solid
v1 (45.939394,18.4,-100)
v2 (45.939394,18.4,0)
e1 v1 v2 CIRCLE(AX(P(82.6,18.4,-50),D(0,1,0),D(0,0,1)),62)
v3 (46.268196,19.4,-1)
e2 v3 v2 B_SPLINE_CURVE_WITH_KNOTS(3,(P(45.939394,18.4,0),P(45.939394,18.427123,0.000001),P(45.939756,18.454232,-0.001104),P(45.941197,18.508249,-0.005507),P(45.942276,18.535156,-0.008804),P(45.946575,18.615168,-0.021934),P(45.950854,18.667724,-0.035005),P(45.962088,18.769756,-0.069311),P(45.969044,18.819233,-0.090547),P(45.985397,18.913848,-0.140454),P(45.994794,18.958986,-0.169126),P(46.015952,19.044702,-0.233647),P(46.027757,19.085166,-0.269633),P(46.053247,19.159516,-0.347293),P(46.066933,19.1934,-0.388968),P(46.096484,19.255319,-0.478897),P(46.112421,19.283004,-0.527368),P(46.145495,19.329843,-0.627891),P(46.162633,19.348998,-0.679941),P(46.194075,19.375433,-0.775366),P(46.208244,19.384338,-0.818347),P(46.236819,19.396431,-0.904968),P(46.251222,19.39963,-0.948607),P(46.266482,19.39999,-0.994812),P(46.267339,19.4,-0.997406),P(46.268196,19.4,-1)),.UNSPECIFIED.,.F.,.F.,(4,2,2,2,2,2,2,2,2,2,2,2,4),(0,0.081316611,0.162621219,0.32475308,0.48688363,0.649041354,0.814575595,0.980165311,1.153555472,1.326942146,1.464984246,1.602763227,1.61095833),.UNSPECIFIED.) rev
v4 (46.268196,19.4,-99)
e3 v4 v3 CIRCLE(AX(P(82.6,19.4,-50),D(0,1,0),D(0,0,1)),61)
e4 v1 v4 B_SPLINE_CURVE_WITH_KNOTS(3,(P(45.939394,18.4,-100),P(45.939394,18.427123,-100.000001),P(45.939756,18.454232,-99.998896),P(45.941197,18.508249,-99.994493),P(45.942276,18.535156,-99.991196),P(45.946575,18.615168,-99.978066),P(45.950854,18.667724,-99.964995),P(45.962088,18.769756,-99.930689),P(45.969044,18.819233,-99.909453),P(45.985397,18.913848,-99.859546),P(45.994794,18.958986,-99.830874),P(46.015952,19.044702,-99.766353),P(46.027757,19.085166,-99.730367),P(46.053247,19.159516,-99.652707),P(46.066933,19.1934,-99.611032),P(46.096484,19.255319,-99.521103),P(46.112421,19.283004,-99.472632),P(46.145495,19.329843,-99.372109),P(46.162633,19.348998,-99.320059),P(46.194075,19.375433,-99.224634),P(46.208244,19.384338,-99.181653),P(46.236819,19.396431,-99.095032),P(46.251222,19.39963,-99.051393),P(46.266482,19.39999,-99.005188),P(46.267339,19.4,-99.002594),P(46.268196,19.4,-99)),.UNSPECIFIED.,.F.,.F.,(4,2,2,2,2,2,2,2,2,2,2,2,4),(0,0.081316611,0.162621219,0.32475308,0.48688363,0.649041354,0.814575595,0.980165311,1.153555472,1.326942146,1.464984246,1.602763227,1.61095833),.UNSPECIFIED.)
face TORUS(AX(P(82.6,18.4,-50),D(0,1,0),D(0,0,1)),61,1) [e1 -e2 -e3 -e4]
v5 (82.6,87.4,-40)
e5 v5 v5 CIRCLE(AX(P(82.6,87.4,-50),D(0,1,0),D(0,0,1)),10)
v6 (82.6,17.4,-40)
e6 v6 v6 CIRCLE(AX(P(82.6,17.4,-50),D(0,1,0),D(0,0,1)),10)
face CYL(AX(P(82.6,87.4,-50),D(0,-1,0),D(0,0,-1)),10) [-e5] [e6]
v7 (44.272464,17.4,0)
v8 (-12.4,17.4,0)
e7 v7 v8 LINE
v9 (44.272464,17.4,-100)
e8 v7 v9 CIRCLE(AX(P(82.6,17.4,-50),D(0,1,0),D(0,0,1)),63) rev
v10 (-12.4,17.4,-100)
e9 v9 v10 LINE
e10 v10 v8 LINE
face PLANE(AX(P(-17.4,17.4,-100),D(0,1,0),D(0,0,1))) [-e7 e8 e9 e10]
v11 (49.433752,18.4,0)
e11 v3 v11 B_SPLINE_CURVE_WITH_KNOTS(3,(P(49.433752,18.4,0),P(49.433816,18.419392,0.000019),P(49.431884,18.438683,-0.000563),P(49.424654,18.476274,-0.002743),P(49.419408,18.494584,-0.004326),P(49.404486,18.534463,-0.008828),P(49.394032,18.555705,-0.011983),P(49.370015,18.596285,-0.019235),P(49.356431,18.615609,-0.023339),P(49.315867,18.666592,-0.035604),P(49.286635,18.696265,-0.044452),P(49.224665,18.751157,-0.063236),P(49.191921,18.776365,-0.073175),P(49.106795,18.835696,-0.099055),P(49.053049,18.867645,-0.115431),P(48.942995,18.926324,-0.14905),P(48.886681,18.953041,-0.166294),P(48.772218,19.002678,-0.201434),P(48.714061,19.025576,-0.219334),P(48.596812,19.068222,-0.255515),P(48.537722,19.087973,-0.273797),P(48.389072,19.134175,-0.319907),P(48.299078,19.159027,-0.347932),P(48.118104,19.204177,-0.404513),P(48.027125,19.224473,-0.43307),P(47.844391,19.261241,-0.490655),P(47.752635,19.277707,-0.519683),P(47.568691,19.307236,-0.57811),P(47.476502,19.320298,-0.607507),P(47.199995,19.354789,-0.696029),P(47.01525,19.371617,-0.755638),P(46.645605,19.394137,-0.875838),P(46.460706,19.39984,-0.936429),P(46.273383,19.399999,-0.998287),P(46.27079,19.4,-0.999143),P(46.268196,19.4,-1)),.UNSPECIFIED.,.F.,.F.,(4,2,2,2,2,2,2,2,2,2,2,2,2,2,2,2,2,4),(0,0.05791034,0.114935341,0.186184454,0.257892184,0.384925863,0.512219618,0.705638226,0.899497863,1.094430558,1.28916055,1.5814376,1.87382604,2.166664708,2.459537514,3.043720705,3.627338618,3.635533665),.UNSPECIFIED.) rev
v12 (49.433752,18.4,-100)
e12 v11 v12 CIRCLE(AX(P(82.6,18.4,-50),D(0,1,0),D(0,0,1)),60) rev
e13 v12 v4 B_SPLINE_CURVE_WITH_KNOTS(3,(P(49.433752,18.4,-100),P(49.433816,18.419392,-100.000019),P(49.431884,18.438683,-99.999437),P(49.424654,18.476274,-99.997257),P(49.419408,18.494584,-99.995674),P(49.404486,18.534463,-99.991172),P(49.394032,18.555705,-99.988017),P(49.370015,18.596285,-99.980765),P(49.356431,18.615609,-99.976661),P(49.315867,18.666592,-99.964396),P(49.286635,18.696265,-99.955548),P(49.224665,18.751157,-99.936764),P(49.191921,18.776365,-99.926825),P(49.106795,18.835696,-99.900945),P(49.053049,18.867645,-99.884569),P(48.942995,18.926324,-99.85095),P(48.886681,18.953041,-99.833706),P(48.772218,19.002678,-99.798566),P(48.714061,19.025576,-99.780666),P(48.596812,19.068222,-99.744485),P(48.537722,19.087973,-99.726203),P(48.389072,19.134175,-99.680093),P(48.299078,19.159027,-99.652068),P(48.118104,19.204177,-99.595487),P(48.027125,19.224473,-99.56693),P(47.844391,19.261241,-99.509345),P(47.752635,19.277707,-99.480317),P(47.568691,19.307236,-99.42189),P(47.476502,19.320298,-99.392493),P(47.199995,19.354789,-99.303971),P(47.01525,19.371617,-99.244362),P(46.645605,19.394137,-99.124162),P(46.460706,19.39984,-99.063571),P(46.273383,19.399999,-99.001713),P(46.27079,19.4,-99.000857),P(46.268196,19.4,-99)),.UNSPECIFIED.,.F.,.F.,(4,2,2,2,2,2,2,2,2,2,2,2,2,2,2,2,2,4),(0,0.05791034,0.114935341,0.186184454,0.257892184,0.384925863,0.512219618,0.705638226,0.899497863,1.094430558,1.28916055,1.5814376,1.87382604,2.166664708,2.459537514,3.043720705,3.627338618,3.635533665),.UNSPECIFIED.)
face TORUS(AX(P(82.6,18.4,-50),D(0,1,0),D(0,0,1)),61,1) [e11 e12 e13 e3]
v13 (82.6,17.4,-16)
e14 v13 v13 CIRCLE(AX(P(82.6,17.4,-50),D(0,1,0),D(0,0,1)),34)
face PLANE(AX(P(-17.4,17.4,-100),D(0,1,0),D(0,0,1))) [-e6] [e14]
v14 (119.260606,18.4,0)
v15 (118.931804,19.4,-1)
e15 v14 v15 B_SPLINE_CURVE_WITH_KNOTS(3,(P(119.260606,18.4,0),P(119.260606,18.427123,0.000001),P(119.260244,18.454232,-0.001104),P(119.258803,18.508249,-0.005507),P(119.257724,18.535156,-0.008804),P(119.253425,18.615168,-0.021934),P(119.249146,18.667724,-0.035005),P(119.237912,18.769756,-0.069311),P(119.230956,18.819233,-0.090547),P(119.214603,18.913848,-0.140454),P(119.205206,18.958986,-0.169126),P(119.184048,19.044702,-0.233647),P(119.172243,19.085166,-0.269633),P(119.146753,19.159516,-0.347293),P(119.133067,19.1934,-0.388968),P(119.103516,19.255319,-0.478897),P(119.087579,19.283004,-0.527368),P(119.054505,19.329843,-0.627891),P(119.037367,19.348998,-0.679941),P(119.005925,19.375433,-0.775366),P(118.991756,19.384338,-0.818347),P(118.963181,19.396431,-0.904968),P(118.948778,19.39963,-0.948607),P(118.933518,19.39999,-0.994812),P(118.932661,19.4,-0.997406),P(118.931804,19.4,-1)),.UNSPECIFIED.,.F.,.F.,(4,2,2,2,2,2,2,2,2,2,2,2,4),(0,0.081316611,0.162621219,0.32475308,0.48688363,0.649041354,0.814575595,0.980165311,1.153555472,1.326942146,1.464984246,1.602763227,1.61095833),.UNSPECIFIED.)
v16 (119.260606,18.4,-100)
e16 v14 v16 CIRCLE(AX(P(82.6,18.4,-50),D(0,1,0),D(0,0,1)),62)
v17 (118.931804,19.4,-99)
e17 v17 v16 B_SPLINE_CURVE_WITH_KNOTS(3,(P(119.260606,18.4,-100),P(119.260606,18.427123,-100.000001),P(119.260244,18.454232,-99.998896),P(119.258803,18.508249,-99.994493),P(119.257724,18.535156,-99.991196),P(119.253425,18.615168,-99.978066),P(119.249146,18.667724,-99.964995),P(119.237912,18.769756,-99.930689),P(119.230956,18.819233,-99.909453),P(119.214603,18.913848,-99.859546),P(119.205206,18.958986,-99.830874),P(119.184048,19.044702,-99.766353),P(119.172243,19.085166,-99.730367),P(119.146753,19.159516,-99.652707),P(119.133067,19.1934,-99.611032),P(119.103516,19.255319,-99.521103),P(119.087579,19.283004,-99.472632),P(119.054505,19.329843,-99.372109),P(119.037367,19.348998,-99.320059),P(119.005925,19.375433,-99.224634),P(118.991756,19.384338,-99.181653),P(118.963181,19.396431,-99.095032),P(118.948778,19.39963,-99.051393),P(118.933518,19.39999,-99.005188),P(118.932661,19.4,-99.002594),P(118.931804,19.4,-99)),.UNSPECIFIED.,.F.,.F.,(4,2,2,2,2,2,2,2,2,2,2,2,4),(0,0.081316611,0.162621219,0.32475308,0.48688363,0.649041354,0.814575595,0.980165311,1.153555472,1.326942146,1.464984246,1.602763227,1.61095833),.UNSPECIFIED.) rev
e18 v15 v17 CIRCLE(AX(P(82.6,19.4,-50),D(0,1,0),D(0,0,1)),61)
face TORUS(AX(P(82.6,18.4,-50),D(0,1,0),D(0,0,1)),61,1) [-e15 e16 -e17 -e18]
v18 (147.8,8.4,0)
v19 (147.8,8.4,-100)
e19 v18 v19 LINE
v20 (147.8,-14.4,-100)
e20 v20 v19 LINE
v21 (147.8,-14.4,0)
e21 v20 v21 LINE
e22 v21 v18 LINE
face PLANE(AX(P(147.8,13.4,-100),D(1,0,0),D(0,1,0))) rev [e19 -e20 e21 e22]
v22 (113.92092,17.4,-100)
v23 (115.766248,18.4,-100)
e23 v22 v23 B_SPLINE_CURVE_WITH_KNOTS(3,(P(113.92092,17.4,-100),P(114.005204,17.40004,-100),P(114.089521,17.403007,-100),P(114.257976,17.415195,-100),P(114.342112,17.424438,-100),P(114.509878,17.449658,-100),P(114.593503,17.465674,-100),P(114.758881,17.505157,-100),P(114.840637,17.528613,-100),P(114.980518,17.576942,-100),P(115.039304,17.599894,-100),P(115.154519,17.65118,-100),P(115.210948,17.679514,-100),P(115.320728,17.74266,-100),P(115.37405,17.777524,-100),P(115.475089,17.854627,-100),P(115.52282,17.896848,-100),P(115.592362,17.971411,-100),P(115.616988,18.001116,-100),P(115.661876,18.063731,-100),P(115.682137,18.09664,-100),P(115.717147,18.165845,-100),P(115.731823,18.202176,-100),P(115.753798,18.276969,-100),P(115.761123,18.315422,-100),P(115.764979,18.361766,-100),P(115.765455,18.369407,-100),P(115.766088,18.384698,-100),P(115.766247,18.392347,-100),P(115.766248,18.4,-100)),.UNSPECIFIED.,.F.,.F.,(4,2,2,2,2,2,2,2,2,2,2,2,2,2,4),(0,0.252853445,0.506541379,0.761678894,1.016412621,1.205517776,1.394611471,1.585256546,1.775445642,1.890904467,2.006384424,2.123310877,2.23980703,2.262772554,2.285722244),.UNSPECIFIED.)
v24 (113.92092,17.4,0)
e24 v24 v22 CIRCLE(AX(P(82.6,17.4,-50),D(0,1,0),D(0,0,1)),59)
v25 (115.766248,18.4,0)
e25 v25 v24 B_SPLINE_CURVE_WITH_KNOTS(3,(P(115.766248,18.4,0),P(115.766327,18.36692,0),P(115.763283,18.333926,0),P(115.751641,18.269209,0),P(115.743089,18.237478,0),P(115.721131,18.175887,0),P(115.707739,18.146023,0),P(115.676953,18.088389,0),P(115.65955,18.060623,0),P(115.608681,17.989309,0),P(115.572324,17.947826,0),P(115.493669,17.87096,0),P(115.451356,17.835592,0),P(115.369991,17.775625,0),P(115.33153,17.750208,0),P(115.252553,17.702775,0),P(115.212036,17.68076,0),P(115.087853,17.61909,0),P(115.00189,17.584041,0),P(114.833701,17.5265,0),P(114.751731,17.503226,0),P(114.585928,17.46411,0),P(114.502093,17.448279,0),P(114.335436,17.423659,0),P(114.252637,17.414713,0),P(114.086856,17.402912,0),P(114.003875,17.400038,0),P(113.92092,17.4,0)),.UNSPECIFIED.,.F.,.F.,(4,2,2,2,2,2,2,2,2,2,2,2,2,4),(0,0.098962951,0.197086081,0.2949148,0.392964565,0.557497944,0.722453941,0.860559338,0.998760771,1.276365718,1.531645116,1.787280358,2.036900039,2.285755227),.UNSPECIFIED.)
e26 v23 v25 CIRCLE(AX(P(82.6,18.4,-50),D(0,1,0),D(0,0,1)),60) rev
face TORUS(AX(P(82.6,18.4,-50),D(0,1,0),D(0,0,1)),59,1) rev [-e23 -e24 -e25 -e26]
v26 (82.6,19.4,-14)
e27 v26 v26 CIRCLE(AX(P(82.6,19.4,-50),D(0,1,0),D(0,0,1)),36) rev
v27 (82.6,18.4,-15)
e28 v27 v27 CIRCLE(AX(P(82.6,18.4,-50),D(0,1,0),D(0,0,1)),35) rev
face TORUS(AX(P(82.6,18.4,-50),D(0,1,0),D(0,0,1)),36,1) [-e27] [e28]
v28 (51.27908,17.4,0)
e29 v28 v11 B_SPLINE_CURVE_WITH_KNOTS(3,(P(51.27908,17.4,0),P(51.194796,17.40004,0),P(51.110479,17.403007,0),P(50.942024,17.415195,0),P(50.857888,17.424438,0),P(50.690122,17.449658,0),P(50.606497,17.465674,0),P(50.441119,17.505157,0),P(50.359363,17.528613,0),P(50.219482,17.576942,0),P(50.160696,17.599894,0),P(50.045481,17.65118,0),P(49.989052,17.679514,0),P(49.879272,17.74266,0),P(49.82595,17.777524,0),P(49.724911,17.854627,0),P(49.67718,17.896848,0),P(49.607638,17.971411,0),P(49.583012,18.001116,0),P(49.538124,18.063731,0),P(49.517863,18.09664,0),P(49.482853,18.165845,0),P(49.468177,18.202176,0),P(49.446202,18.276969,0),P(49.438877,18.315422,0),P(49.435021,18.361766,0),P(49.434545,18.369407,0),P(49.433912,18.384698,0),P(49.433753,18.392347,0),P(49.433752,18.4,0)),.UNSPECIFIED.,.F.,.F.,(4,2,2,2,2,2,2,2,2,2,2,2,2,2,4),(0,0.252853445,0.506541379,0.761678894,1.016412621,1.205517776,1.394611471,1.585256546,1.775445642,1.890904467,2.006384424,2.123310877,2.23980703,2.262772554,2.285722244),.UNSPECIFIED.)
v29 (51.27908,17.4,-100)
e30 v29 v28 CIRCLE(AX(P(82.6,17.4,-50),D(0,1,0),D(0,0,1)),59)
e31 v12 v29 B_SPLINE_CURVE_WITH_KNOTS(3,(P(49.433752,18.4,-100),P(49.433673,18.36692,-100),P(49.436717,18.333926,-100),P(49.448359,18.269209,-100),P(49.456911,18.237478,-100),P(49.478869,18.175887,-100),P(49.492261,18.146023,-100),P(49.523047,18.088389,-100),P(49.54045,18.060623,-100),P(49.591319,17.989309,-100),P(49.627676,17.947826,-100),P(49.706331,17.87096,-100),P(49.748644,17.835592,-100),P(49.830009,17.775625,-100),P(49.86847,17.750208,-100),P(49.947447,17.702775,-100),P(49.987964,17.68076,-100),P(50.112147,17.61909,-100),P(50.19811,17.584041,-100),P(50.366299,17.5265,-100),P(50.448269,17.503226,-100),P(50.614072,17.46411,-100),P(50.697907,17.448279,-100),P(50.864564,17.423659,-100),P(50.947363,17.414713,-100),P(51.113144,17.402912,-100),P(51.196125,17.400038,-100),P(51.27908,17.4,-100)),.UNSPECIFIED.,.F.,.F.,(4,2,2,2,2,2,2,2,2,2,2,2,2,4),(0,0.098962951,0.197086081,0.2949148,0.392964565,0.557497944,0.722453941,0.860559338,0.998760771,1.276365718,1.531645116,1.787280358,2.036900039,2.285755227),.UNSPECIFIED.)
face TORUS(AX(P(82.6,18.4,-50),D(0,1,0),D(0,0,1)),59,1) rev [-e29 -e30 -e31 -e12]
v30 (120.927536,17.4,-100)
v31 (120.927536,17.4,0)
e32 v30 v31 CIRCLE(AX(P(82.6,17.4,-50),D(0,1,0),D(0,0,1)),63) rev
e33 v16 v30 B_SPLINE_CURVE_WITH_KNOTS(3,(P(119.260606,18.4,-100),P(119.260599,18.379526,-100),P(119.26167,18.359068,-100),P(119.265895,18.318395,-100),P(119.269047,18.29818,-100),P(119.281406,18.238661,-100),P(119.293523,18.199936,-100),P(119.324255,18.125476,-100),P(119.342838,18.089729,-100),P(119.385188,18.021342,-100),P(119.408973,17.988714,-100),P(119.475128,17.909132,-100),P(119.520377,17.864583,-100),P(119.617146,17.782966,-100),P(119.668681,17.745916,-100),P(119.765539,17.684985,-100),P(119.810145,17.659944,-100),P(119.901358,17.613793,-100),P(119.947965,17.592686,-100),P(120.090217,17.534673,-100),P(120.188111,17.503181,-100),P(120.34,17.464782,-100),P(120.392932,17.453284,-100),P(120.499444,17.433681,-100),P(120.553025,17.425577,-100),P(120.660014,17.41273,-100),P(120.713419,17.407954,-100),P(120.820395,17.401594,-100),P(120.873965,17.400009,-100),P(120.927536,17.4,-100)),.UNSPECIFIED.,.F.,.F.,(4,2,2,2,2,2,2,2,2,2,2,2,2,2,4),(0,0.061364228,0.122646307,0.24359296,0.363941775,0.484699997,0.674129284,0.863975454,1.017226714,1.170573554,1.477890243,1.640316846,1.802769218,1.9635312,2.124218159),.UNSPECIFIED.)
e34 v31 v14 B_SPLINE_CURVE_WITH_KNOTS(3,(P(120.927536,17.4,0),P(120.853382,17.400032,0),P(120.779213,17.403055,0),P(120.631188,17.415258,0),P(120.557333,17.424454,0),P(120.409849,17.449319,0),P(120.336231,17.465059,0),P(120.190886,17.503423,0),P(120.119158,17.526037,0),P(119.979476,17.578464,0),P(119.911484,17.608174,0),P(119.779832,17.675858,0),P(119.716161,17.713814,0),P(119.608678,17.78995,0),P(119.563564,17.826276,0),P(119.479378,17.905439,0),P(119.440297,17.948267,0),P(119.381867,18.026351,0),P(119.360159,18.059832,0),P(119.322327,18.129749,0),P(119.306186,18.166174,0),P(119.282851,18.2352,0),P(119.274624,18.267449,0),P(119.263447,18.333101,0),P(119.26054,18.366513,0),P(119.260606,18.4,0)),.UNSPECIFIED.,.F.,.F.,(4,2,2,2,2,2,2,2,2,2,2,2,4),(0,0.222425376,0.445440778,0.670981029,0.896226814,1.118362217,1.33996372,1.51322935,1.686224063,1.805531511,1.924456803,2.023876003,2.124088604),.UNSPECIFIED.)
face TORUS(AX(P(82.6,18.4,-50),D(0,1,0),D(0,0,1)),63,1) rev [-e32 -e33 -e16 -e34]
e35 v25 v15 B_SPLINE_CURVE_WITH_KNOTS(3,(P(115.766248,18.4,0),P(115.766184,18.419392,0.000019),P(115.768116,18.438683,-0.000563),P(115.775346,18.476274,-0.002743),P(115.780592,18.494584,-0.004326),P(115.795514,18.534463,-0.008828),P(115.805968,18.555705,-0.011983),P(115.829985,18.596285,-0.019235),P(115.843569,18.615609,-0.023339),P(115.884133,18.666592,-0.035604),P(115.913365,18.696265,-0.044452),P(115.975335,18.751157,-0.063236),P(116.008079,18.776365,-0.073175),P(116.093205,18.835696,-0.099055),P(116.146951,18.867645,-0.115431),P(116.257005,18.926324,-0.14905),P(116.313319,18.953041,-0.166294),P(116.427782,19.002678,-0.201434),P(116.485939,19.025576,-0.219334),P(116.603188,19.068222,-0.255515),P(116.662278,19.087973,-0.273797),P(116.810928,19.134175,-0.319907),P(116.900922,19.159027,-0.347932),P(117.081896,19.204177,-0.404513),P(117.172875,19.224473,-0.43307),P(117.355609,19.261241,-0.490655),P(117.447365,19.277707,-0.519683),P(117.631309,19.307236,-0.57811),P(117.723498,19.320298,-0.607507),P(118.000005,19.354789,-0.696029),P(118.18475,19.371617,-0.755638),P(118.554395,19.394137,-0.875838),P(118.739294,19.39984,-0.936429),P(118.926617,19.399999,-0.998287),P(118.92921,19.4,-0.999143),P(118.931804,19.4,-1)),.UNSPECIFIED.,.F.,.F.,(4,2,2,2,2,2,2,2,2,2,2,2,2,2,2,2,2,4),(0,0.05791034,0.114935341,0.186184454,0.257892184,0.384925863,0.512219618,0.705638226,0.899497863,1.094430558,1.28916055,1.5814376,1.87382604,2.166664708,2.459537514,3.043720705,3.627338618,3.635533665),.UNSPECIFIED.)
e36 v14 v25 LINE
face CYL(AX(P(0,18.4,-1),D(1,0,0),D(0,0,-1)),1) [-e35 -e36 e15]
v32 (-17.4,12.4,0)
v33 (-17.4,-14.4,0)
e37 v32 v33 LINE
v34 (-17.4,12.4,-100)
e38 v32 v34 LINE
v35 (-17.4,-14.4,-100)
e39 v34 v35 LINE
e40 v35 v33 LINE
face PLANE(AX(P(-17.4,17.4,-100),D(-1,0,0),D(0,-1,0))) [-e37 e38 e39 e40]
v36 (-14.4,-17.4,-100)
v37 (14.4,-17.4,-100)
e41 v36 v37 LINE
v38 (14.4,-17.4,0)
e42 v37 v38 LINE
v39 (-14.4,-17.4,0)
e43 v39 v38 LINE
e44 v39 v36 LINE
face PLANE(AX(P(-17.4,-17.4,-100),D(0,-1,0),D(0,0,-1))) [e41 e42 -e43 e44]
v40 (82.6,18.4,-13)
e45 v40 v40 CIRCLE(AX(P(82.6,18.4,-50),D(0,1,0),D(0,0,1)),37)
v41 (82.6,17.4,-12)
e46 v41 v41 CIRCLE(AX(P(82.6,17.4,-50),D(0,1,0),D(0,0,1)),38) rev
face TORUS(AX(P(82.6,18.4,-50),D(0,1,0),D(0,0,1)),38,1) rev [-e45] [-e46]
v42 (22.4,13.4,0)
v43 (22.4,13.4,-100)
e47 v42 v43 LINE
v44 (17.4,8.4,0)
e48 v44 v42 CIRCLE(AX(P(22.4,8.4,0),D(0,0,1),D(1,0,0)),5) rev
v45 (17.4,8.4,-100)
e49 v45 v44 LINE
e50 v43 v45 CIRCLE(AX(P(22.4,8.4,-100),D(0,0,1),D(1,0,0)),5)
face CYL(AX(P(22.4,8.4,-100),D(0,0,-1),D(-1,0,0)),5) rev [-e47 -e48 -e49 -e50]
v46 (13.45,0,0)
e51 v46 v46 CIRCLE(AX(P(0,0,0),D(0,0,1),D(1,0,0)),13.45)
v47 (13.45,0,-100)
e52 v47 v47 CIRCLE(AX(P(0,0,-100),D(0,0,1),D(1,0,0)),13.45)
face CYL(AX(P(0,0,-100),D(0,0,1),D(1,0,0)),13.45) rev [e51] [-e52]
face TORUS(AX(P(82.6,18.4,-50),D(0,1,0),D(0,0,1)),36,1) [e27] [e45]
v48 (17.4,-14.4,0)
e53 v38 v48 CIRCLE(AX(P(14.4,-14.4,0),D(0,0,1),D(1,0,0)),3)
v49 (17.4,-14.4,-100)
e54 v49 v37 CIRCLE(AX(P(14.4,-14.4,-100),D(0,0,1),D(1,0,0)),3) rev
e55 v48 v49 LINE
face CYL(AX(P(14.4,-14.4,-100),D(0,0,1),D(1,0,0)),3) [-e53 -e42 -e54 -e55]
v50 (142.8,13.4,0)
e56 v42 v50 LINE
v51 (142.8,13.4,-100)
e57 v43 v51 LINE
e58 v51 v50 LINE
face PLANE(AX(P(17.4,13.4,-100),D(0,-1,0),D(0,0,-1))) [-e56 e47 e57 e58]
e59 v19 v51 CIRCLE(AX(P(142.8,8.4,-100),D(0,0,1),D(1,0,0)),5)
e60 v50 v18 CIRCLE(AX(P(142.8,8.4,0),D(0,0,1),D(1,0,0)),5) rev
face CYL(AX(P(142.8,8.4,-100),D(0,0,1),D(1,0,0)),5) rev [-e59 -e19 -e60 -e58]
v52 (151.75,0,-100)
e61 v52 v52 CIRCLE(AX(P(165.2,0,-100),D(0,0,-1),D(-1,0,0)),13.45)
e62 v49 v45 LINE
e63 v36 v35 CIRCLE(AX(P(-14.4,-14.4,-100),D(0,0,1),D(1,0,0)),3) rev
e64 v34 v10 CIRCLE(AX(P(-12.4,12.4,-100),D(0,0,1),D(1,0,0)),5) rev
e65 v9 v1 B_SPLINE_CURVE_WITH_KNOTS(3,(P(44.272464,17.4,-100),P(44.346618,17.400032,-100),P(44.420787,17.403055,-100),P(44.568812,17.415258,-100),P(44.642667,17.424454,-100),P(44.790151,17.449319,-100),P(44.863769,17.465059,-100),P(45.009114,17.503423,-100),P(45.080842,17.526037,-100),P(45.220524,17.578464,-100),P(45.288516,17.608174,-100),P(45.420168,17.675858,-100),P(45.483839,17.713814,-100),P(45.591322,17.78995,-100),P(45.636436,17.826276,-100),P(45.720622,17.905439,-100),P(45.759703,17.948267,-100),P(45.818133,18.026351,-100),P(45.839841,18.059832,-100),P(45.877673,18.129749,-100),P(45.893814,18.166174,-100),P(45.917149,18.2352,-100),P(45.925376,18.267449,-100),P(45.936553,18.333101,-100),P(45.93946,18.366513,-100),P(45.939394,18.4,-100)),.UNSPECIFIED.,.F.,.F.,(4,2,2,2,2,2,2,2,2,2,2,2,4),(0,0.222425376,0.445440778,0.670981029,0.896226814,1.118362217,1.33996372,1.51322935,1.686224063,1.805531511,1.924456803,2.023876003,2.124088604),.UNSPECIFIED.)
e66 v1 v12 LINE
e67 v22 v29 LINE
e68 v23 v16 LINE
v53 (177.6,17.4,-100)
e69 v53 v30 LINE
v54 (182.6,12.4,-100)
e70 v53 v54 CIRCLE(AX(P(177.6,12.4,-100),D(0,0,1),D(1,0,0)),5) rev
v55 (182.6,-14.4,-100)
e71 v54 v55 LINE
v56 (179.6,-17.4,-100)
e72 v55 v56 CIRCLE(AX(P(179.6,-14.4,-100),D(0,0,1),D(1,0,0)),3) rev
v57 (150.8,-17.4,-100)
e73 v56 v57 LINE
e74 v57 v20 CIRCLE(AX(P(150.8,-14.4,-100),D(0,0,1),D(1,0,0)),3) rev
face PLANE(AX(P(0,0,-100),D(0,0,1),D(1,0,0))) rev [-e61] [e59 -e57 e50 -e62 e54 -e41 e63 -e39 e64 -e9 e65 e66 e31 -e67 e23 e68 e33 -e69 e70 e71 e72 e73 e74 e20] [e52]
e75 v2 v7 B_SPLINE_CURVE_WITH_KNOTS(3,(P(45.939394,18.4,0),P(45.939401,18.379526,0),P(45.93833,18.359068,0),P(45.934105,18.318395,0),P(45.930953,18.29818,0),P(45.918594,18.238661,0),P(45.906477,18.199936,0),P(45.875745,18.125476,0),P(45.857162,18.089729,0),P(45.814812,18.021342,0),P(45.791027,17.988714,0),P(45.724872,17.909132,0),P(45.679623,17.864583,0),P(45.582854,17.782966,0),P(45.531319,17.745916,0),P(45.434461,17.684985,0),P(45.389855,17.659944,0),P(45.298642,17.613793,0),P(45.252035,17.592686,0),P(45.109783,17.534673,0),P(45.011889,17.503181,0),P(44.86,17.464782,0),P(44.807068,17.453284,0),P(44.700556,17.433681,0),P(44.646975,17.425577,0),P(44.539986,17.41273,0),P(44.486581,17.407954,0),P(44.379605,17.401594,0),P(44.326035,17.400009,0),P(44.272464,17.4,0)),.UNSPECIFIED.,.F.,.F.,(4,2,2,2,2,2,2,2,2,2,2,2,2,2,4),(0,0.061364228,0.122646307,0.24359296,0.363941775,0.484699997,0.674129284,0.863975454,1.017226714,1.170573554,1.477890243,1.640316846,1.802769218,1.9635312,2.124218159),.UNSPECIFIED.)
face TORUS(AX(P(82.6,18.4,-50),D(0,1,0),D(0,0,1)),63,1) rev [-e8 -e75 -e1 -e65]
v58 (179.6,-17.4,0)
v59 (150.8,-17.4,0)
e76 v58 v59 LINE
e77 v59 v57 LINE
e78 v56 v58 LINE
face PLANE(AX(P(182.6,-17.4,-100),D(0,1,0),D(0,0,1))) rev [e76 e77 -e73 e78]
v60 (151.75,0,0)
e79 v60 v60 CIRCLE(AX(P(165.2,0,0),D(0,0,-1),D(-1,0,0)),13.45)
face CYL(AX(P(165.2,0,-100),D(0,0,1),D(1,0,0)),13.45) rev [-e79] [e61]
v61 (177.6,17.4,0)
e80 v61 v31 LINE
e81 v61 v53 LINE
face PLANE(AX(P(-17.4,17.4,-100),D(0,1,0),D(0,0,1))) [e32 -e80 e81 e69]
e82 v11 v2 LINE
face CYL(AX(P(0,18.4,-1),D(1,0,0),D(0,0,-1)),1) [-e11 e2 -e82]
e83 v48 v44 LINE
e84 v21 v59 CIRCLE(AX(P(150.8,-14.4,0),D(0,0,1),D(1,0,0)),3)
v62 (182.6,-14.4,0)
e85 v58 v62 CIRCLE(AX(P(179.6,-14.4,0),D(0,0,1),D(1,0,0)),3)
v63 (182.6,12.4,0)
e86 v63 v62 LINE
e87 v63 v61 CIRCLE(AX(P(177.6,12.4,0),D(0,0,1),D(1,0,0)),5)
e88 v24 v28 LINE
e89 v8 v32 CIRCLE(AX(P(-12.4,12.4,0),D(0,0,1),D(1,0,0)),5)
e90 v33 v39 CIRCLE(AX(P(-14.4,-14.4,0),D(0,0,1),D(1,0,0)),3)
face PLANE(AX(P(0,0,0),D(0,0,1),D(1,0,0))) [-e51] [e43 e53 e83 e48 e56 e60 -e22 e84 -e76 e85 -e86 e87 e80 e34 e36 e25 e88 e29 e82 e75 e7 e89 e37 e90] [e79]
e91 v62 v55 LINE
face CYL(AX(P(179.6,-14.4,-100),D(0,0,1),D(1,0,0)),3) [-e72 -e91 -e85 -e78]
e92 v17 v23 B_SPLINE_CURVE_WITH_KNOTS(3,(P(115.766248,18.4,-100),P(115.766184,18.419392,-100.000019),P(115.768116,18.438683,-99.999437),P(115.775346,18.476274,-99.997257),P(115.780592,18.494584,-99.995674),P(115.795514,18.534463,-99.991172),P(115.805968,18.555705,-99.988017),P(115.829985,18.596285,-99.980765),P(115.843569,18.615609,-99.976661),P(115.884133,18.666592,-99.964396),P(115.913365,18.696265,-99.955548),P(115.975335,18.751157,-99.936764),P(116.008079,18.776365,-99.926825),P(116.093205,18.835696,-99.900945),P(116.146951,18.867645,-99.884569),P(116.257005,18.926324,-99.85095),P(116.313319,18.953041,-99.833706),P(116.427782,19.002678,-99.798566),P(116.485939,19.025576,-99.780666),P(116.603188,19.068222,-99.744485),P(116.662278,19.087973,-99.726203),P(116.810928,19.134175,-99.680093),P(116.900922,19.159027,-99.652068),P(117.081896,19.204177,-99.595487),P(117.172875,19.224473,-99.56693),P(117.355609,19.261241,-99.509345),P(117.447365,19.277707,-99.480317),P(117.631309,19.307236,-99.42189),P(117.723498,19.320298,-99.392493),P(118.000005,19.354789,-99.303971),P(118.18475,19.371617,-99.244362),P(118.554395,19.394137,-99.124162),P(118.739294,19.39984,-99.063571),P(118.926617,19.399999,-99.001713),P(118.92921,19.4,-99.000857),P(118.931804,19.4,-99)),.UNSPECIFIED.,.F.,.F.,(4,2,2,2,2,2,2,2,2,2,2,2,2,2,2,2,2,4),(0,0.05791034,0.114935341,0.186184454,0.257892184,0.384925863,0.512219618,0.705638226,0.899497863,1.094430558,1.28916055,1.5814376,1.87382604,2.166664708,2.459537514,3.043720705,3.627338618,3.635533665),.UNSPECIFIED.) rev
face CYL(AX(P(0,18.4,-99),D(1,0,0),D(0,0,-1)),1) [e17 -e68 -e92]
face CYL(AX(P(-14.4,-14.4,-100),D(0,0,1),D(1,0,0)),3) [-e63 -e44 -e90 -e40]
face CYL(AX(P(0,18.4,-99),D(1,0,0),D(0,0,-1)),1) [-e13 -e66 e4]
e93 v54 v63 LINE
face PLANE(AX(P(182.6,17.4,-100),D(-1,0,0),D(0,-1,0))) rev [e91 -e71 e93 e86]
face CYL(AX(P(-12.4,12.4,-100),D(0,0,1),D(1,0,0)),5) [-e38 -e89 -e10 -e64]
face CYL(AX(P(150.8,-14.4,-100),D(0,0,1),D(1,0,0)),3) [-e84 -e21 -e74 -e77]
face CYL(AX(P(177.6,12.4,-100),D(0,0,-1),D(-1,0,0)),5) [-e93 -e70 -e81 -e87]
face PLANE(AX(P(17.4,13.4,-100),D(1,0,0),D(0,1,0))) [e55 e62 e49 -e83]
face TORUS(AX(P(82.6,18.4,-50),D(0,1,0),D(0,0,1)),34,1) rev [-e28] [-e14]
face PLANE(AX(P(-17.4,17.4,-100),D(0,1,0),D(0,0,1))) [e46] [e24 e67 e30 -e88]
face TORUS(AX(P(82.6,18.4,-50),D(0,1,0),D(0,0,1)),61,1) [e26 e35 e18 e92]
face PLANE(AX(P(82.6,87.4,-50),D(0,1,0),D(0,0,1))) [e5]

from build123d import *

# Parameters (mm, degrees)
SKETCH1_R           = 13.45
BOSS_EXTRUDE1_DEPTH = 100
SKETCH2_R           = 9.999999999999995
BOSS_EXTRUDE2_DEPTH = 70
SKETCH3_R           = 37.00000000000001
SKETCH3_R_2         = 35.00000000000001
BOSS_EXTRUDE3_DEPTH = 2
FILLET1_R           = 1
FILLET2_R           = 5
FILLET3_R           = 3


with BuildPart() as part:
    # Sketch1 → Boss-Extrude1 (new body)
    with BuildSketch(Plane.XY):
        Polygon((-17.400000000000034, 17.399999999999995), (17.399999999999963, 17.399999999999995), (82.59999999999998, 17.399999999999995), (82.59999999999998, 13.399999999999995), (17.399999999999963, 13.399999999999995), (17.399999999999977, -17.400000000000002), (-17.40000000000002, -17.400000000000002), align=None)
        Circle(SKETCH1_R, mode=Mode.SUBTRACT)
    boss_extrude1 = extrude(amount=-BOSS_EXTRUDE1_DEPTH)

    # Mirror1: Boss-Extrude1 across plane
    add(boss_extrude1.mirror(Plane(origin=(82.59999999999998, 17.399999999999995, -100), x_dir=(0, 0, 1), z_dir=(1, 0, 0))))

    # Sketch2 → Boss-Extrude2 (add)
    with BuildSketch(Plane(origin=(0, 17.399999999999995, 0), x_dir=(1, 0, 0), z_dir=(0, 1, 0))):
        with Locations(Location((82.59999999999998, 50, 0), (0, 0, 270))):
            Circle(SKETCH2_R)
    extrude(amount=BOSS_EXTRUDE2_DEPTH)

    # Sketch3 → Boss-Extrude3 (add)
    # profile 1 of 5: a face of its own
    with BuildSketch(Plane(origin=(0, 17.399999999999995, 0), x_dir=(1, 0, 0), z_dir=(0, 1, 0))):
        with BuildLine():
            ThreePointArc((115.76624790355208, 100.00000000000125), (135.46764073709514, 78.37274330926492), (142.59999999999997, 50))
            ThreePointArc((142.59999999999997, 49.999999999999986), (135.4676407370951, 21.62725669073505), (115.76624790355206, -1.26477e-12))
            Line((115.76624790355174, 0), (119.26060555964779, 0))
            ThreePointArc((119.26060555964757, 6.3949e-13), (137.90351500898538, 21.972848384987014), (144.59999999999997, 49.999999999999986))
            ThreePointArc((144.59999999999997, 50), (137.9035150089854, 78.02715161501295), (119.26060555964762, 99.99999999999932))
            Line((119.26060555964781, 100), (115.76624790355174, 100))
        make_face()
    # profile 2 of 5: a face of its own
    with BuildSketch(Plane(origin=(0, 17.399999999999995, 0), x_dir=(1, 0, 0), z_dir=(0, 1, 0))):
        with BuildLine():
            ThreePointArc((49.43375209644623, -1.7053e-13), (22.59999999999998, 50.00000000000001), (49.43375209644624, 100.00000000000017))
            Line((49.433752096446284, 100), (45.93939444035465, 100))
            ThreePointArc((45.9393944403544, 100.00000000000084), (20.59999999999998, 50.00000000000001), (45.93939444035441, -8.4555e-13))
            Line((45.939394440354675, 0), (49.433752096446284, 0))
        make_face()
    # profile 3 of 5: a face of its own
    with BuildSketch(Plane(origin=(0, 17.399999999999995, 0), x_dir=(1, 0, 0), z_dir=(0, 1, 0))):
        with Locations(Location((82.59999999999998, 50, 0), (0, 0, 270))):
            Circle(SKETCH3_R)
        with Locations(Location((82.59999999999998, 50, 0), (0, 0, 270))):
            Circle(SKETCH3_R_2, mode=Mode.SUBTRACT)
    # profile 4 of 5: a face of its own
    with BuildSketch(Plane(origin=(0, 17.399999999999995, 0), x_dir=(1, 0, 0), z_dir=(0, 1, 0))):
        with BuildLine():
            ThreePointArc((115.76624790355208, 100.00000000000125), (135.46764073709514, 78.37274330926492), (142.59999999999997, 50))
            ThreePointArc((142.59999999999997, 49.999999999999986), (135.4676407370951, 21.62725669073505), (115.76624790355206, -1.26477e-12))
            Line((115.76624790355174, 0), (119.26060555964779, 0))
            ThreePointArc((119.26060555964757, 6.3949e-13), (137.90351500898538, 21.972848384987014), (144.59999999999997, 49.999999999999986))
            ThreePointArc((144.59999999999997, 50), (137.9035150089854, 78.02715161501295), (119.26060555964762, 99.99999999999932))
            Line((119.26060555964781, 100), (115.76624790355174, 100))
        make_face()
    # profile 5 of 5: a face of its own
    with BuildSketch(Plane(origin=(0, 17.399999999999995, 0), x_dir=(1, 0, 0), z_dir=(0, 1, 0))):
        with BuildLine():
            ThreePointArc((49.43375209644623, -1.7053e-13), (22.59999999999998, 50.00000000000001), (49.43375209644624, 100.00000000000017))
            Line((49.433752096446284, 100), (45.93939444035465, 100))
            ThreePointArc((45.9393944403544, 100.00000000000084), (20.59999999999998, 50.00000000000001), (45.93939444035441, -8.4555e-13))
            Line((45.939394440354675, 0), (49.433752096446284, 0))
        make_face()
    extrude(amount=BOSS_EXTRUDE3_DEPTH)

    # Fillet1
    fillet1_edges = [part.edges().sort_by_distance(p)[0] for p in [
        (20.599999999999973, 17.399999999999995, -50),
        (22.59999999999998, 19.399999999999995, -50.00000000000001),
        (47.686573268400466, 19.399999999999995, -100),
        (20.599999999999973, 19.399999999999995, -50),
        (47.68657326840048, 19.399999999999995, 0),
        (22.59999999999998, 17.399999999999995, -50.00000000000001),
        (82.6, 17.399999999999995, -85),
        (82.6, 19.399999999999995, -85),
        (82.6, 17.399999999999995, -87),
        (82.6, 19.399999999999995, -87),
        (144.59999999999997, 17.399999999999995, -49.999999999999986),
        (142.59999999999997, 19.399999999999995, -50),
        (117.51342673159976, 19.399999999999995, 0),
        (144.59999999999997, 19.399999999999995, -49.999999999999986),
        (117.51342673159978, 19.399999999999995, -100),
        (142.59999999999997, 17.399999999999995, -50.00000000000001),
    ]]
    fillet(fillet1_edges, radius=FILLET1_R - 0.0001)  # a hair under: the kernel refuses the full size

    # Fillet2
    fillet2_edges = [part.edges().sort_by_distance(p)[0] for p in [
        (-17.400000000000034, 17.399999999999995, -50),
        (17.399999999999963, 13.399999999999995, -50),
        (147.8, 13.399999999999995, -50),
        (182.6, 17.399999999999995, -50),
    ]]
    fillet(fillet2_edges, radius=FILLET2_R)

    # Fillet3
    fillet3_edges = [part.edges().sort_by_distance(p)[0] for p in [
        (17.399999999999977, -17.400000000000002, -50),
        (-17.40000000000002, -17.400000000000002, -50),
        (147.79999999999998, -17.400000000000002, -50),
        (182.59999999999997, -17.400000000000002, -50),
    ]]
    fillet(fillet3_edges, radius=FILLET3_R)


solid = part.part
